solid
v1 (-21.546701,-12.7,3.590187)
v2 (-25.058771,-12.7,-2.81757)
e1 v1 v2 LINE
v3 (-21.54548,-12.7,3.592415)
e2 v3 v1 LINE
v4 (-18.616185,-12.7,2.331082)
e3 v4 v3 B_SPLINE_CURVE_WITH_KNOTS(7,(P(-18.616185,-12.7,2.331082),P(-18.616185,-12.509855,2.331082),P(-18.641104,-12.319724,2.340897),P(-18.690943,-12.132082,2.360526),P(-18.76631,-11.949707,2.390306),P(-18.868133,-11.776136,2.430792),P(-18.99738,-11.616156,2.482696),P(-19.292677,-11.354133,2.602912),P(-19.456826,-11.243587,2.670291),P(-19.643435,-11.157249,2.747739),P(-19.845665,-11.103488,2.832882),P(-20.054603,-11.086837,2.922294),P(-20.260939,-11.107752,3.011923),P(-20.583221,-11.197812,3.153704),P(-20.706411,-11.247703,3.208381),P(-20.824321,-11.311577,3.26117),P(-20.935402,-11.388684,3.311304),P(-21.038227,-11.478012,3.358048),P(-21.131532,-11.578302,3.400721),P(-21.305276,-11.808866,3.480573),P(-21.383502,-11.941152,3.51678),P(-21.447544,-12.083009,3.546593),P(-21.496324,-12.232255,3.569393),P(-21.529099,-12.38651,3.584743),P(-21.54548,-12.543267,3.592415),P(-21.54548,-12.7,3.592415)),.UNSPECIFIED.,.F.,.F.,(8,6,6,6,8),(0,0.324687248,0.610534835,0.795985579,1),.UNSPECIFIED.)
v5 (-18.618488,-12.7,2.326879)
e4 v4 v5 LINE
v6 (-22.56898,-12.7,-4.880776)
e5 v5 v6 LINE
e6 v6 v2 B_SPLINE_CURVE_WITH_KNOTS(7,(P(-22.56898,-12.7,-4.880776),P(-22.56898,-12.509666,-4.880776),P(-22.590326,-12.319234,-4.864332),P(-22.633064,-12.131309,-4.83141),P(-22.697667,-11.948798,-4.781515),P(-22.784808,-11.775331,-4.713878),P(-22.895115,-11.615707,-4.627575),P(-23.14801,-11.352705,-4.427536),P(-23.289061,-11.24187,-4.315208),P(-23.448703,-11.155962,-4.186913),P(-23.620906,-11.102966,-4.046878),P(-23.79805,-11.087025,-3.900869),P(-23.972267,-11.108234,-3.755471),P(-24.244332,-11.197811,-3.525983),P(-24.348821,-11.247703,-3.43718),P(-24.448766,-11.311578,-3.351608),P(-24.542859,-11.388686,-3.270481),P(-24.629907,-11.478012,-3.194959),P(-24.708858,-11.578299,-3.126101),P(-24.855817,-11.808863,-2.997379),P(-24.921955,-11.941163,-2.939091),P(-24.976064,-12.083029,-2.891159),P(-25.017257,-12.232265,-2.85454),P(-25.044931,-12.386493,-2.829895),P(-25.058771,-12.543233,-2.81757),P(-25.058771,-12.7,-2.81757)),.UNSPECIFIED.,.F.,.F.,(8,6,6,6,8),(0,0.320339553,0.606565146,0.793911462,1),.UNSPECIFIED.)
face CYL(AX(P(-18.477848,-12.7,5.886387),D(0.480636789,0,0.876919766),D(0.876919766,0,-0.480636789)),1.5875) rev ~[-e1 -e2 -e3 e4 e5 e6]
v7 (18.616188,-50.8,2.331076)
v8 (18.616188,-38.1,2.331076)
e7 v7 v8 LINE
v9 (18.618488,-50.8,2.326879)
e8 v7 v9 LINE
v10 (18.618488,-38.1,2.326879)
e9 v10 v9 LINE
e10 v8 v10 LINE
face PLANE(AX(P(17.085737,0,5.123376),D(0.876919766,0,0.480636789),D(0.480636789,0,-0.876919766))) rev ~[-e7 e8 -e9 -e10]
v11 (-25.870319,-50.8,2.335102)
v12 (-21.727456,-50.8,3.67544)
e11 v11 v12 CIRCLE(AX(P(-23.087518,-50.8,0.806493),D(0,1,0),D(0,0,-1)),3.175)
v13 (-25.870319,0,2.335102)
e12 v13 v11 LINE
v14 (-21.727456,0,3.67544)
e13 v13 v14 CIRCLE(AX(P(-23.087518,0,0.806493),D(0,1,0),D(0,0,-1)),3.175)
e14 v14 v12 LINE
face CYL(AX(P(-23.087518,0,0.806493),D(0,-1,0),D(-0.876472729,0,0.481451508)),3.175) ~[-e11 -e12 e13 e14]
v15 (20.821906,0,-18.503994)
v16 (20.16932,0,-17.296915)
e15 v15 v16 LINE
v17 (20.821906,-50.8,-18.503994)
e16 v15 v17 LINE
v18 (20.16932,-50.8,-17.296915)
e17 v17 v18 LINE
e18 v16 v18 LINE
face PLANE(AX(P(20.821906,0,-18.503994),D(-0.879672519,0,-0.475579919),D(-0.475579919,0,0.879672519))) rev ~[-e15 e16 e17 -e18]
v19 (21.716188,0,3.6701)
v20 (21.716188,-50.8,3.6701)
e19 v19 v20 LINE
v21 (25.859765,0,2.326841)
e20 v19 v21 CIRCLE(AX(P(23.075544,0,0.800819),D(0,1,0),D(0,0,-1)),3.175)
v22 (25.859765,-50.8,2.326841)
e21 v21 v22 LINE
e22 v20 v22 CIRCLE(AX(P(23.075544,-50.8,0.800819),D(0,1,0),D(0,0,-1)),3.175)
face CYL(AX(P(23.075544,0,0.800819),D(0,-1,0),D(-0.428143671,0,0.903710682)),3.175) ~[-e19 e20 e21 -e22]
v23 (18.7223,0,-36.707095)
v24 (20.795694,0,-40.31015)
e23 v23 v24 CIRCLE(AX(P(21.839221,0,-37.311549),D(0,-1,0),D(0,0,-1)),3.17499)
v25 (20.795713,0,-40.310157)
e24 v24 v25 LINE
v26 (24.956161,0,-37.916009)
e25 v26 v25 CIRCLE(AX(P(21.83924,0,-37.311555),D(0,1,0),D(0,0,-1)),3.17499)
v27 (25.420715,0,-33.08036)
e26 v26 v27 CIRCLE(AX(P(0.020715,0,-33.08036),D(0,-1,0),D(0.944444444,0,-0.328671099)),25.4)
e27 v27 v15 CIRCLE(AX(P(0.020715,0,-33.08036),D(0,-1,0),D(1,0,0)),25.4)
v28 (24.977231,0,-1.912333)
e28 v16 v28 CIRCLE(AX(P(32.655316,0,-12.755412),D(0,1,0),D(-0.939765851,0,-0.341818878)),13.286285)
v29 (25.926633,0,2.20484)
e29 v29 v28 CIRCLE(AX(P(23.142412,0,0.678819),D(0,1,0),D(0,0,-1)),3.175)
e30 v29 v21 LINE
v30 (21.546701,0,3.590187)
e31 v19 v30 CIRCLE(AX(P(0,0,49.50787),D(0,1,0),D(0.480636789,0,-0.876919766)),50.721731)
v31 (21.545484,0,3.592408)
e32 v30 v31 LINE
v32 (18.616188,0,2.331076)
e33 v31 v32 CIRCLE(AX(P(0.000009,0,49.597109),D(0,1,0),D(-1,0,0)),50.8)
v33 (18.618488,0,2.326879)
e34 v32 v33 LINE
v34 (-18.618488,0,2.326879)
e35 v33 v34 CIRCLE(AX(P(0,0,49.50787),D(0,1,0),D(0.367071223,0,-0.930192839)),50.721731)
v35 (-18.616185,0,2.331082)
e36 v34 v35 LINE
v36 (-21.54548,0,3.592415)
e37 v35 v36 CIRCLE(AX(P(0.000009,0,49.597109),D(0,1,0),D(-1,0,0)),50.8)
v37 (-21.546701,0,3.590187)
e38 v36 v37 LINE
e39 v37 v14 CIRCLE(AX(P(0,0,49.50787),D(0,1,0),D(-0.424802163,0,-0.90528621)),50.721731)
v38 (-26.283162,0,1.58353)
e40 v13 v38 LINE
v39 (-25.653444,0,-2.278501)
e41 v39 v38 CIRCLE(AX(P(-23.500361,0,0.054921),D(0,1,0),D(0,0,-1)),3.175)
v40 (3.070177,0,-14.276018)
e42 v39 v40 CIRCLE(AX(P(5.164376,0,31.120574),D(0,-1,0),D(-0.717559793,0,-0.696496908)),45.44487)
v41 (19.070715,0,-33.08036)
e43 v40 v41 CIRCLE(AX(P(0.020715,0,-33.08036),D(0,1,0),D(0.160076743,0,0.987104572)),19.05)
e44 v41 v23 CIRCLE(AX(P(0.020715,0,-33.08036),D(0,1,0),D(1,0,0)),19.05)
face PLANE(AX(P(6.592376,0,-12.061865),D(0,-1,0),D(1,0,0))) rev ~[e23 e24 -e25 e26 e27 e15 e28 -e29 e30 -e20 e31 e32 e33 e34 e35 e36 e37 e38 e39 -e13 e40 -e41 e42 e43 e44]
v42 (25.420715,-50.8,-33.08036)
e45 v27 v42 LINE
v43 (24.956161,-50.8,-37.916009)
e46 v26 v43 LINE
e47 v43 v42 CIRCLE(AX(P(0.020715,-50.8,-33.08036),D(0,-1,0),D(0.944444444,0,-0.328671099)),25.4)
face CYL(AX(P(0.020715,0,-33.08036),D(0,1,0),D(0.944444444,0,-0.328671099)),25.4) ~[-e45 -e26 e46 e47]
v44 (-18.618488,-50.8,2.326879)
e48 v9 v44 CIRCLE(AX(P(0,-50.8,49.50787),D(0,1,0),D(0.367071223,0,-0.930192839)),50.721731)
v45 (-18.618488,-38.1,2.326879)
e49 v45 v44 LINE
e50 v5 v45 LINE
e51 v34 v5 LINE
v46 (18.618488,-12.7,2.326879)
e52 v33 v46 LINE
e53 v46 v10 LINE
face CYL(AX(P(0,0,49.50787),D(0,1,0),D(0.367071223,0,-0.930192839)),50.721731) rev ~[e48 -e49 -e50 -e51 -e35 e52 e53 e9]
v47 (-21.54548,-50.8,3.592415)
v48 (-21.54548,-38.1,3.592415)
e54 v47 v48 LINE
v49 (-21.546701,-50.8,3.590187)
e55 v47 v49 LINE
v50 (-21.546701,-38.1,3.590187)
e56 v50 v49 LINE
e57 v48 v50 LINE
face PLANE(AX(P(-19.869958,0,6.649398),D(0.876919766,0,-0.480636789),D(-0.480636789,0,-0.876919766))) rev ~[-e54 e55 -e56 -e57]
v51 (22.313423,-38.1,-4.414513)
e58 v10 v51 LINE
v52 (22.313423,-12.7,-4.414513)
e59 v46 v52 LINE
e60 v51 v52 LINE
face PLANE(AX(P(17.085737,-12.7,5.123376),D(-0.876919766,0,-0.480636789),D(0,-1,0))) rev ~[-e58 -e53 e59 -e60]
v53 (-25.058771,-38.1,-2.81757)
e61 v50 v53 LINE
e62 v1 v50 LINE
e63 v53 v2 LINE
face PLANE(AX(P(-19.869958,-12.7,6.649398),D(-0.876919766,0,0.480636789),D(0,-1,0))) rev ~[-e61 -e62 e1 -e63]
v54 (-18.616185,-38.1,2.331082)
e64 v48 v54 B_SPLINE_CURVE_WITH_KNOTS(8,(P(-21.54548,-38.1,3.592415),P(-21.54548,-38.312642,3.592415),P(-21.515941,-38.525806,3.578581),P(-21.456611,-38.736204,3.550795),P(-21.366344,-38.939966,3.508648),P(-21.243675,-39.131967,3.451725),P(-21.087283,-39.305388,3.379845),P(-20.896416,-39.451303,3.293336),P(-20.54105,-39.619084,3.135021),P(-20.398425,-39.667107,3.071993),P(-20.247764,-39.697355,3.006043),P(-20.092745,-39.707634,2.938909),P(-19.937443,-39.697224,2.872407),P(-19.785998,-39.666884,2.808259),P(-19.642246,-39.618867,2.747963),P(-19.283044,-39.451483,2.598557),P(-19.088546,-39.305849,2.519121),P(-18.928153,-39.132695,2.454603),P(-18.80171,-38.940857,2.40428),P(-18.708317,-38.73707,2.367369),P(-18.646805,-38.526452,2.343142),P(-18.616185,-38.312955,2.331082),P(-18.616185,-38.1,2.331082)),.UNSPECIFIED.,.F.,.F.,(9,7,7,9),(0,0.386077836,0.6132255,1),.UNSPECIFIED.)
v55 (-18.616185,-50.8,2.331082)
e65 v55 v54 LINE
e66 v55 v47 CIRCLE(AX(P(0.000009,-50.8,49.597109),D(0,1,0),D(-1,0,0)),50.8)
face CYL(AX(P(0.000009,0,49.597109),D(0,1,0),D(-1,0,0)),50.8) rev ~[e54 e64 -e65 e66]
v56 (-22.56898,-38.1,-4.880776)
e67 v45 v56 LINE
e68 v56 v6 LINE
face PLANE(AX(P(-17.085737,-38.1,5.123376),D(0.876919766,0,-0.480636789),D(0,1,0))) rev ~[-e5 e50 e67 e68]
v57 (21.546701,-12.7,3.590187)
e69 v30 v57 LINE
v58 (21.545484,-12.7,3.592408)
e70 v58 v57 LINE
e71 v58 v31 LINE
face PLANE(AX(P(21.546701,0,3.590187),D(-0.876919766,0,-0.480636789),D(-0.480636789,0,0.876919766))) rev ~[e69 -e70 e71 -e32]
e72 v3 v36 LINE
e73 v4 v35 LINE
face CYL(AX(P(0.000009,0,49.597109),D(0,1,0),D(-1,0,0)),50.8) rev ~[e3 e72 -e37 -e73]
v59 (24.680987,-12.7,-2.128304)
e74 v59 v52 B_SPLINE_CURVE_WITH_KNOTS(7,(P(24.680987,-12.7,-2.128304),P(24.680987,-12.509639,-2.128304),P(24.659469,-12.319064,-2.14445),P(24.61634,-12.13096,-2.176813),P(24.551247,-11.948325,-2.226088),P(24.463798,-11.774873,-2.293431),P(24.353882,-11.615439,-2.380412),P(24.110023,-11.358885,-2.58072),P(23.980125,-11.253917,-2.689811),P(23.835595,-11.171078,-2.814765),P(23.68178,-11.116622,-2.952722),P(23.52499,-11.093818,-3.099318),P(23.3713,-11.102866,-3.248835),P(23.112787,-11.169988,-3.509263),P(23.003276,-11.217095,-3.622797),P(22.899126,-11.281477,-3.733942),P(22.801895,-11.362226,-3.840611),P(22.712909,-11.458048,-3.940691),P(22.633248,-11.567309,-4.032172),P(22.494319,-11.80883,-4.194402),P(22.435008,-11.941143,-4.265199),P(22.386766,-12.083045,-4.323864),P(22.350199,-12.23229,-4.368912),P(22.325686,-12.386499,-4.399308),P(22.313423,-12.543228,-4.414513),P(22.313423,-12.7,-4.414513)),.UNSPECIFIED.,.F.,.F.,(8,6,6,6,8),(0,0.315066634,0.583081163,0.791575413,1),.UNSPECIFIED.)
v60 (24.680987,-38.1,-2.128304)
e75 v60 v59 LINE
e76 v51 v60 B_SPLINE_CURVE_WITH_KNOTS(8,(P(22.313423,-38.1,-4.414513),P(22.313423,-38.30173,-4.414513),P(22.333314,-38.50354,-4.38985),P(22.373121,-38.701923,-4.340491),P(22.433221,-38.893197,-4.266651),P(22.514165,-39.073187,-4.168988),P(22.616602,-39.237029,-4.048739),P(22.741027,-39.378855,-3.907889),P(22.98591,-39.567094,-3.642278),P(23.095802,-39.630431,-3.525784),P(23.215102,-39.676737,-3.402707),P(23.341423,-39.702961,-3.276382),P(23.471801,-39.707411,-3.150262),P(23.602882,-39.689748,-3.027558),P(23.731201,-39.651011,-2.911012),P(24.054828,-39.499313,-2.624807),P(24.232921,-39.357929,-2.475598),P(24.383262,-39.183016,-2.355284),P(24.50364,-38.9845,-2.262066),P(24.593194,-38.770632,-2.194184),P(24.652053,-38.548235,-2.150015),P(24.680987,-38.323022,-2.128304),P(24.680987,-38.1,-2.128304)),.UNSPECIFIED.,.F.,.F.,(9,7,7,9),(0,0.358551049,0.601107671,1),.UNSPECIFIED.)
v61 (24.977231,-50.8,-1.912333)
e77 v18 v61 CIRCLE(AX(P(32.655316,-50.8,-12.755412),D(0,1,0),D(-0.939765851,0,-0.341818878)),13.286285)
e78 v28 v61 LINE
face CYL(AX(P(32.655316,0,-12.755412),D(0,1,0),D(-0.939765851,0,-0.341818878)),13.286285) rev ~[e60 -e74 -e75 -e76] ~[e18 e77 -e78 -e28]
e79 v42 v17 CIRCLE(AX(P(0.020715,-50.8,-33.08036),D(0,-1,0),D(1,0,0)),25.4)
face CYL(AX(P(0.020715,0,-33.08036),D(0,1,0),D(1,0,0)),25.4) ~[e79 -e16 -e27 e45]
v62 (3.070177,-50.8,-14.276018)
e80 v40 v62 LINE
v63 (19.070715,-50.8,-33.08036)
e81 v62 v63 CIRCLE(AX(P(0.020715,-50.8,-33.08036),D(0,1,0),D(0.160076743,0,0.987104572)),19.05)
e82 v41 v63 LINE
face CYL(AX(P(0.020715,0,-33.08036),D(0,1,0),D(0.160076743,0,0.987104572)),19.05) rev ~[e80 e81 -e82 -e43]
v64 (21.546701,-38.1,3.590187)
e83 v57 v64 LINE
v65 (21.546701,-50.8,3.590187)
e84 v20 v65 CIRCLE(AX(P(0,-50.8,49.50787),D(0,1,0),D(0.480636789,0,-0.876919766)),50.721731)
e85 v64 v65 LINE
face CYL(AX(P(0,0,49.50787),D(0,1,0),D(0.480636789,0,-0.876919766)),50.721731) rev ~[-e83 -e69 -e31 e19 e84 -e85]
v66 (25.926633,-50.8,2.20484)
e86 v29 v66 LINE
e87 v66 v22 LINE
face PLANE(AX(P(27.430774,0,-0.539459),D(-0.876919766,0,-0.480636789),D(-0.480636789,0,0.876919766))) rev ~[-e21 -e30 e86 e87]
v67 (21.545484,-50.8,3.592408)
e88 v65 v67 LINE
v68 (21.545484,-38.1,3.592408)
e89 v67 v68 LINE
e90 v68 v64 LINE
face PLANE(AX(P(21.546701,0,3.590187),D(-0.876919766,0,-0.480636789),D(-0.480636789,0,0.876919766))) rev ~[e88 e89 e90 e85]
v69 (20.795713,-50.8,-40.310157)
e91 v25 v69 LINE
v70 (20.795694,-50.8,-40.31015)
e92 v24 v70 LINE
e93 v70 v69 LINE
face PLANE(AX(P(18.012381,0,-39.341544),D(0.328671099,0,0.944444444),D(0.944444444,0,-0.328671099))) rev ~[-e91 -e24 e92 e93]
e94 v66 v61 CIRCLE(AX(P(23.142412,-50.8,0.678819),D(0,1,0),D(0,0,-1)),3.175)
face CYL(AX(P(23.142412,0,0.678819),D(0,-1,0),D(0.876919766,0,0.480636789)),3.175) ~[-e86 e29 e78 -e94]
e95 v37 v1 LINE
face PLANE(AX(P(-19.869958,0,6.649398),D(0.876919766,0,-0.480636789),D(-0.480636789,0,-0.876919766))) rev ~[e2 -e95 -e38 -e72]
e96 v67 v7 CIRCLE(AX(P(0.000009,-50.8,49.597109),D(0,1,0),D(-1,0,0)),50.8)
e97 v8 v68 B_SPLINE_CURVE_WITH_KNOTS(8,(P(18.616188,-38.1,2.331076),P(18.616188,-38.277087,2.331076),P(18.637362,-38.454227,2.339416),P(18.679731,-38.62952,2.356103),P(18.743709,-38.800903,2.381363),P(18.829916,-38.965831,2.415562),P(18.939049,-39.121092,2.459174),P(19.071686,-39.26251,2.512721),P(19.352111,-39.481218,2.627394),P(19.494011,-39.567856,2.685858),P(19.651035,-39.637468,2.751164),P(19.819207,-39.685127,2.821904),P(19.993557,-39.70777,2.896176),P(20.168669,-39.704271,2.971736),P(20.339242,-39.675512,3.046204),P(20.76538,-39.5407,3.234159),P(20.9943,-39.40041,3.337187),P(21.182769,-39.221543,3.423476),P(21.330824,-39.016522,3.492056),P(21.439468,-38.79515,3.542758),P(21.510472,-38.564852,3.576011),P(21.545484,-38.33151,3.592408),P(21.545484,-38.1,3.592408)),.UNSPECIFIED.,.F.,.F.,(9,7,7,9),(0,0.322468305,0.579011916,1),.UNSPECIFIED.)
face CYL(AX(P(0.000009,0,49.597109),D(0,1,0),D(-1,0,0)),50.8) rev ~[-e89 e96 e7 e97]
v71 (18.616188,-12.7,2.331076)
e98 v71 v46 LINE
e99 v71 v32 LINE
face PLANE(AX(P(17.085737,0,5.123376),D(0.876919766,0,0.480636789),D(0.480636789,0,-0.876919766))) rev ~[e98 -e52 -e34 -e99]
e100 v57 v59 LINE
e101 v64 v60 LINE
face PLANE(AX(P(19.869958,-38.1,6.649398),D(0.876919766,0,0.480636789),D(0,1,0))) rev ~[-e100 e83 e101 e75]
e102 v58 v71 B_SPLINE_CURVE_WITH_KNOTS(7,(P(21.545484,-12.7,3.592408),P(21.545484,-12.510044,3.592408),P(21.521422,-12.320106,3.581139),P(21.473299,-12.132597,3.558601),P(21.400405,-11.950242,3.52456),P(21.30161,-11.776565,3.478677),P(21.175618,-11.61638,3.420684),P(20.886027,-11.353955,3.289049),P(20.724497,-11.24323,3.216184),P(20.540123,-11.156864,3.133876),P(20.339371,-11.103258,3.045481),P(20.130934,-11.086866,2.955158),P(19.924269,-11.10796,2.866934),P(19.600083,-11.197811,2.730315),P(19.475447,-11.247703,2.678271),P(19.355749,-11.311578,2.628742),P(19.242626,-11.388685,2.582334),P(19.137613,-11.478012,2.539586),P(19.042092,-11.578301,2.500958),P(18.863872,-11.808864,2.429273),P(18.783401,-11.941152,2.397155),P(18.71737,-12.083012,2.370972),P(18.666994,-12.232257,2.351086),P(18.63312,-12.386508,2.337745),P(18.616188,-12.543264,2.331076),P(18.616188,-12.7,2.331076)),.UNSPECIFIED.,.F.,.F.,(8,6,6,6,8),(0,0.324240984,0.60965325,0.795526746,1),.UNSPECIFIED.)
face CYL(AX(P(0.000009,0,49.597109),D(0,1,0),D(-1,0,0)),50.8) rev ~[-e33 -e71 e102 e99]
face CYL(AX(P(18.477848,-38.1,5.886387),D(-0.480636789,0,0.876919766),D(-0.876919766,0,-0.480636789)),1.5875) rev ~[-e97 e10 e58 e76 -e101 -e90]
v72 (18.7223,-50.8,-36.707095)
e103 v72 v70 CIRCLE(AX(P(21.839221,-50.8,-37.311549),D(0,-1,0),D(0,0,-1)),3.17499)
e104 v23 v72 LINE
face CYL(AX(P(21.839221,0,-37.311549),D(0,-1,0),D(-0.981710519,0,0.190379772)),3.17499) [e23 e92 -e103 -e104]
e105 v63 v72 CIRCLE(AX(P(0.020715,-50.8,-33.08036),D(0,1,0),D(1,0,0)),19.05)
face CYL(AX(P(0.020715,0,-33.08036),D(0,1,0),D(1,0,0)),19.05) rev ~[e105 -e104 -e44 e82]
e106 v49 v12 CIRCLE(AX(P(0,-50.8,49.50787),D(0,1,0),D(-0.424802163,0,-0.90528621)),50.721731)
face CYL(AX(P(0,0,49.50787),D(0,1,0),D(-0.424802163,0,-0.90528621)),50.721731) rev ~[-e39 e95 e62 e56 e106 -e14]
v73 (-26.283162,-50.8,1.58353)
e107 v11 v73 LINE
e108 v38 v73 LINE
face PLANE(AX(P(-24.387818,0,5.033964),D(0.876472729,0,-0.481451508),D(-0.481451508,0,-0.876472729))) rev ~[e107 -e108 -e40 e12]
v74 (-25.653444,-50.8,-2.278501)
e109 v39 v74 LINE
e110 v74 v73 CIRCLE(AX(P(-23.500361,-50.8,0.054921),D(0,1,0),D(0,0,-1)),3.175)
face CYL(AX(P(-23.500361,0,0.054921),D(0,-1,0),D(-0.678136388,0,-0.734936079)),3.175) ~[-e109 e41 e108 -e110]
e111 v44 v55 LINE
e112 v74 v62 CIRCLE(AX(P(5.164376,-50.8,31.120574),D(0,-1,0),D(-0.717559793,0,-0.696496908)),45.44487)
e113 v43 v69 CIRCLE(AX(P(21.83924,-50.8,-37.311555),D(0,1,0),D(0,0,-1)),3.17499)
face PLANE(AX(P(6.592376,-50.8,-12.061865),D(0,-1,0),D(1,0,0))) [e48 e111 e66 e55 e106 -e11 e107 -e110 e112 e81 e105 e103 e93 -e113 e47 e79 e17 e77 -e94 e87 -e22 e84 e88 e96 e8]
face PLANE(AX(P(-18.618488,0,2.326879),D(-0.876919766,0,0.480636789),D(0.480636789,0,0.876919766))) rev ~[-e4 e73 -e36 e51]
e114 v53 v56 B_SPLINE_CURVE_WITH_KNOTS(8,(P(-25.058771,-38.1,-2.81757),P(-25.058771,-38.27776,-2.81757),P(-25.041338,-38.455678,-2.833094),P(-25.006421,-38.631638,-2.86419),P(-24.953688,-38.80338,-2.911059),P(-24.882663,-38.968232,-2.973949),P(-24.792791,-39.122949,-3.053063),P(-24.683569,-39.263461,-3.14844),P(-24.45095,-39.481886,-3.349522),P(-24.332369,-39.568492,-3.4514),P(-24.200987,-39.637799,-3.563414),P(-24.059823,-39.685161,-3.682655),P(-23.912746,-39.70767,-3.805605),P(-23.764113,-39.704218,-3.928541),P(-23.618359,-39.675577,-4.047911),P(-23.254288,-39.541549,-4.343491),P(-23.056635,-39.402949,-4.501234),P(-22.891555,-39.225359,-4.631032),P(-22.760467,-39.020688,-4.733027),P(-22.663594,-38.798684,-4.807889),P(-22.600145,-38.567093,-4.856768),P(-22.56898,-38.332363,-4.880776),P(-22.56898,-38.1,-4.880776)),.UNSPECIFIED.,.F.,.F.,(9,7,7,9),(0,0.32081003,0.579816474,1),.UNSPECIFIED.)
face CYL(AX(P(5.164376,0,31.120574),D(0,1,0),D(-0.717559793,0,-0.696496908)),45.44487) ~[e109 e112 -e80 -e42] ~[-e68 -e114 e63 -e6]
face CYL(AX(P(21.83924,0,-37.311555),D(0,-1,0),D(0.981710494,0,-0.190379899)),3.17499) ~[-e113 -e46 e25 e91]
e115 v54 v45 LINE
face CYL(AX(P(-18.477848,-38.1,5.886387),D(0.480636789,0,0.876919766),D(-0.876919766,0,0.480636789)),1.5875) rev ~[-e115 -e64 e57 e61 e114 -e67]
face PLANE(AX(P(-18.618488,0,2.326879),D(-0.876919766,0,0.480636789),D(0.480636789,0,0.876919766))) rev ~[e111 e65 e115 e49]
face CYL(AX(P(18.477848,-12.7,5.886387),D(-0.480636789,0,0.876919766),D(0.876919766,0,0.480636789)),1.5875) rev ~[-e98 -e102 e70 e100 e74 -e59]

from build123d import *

# Parameters (mm, degrees)
F1_DEPTH = 50.8
F2_R     = 3.17499
F4_DEPTH = 25.4
F6_DEPTH = 25.4
F7_R     = 50.8
F8_DEPTH = 50.8
F9_R     = 3.175


# Not quite as in the source:
# - a fillet or chamfer is up to 0.001 mm smaller than in the source, because OpenCascade refuses the exact size
# - a feature names something its author has since deleted; it is built from what else it names


with BuildPart() as f1:
    # F0 (on Front) → F1 (new body)
    with BuildSketch(Plane.XZ):
        with BuildLine():
            ThreePointArc((24.0096036311, -41.4286058918), (25.0654524906, -37.313693309), (25.4207147422, -33.0803599757))
            ThreePointArc((25.4207147422, -33.0803599757), (24.2437436495, -25.4380520418), (20.821906037, -18.5039941488))
            Line((20.821906037, -18.5039941488), (20.1693195051, -17.2969153494))
            ThreePointArc((20.1693195051, -17.2969153494), (20.4643815884, -7.4727541905), (27.4307736322, -0.5394587257))
            Line((27.4307736322, -0.5394587257), (24.3787300207, 5.0289817915))
            ThreePointArc((24.3787300207, 5.0289817915), (22.9739817859, 4.2874085483), (21.5467011146, 3.5901866586))
            ThreePointArc((21.5467011146, 3.5901866586), (20.0925256969, 2.935513576), (18.6184879198, 2.3268793492))
            ThreePointArc((18.6184879198, 2.3268793492), (0, -1.2138607271), (-18.6184879198, 2.3268793492))
            ThreePointArc((-18.6184879198, 2.3268793492), (-20.0925256969, 2.935513576), (-21.5467011146, 3.5901866586))
            ThreePointArc((-21.5467011146, 3.5901866586), (-22.97860176, 4.289755995), (-24.3878181692, 5.0339641827))
            Line((-24.3878181692, 5.0339641827), (-27.4450352449, -0.5316376492))
            ThreePointArc((-27.4450352449, -0.5316376492), (-13.4987465328, -10.3152085141), (3.0701766945, -14.276017876))
            ThreePointArc((3.0701766945, -14.276017876), (14.5292424103, -20.7351129184), (19.0707147422, -33.0803599757))
            ThreePointArc((19.0707147422, -33.0803599757), (18.8042680535, -36.2553599757), (18.0123814088, -39.3415444128))
            Line((18.0123814088, -39.3415444128), (24.0096036311, -41.4286058918))
        make_face()
        with BuildLine():
            ThreePointArc((18.6184879198, 2.3268793492), (20.0925256969, 2.935513576), (21.5467011146, 3.5901866586))
            Line((21.5467011146, 3.5901866586), (19.869957668, 6.6493979065))
            Line((19.869957668, 6.6493979065), (17.0857374094, 5.1233761008))
            Line((17.0857374094, 5.1233761008), (18.6184879198, 2.3268793492))
        make_face()
        with BuildLine():
            ThreePointArc((-21.5467011146, 3.5901866586), (-20.0925256969, 2.935513576), (-18.6184879198, 2.3268793492))
            Line((-18.6184879198, 2.3268793492), (-17.0857374094, 5.1233761008))
            Line((-17.0857374094, 5.1233761008), (-19.869957668, 6.6493979065))
            Line((-19.869957668, 6.6493979065), (-21.5467011146, 3.5901866586))
        make_face()
    extrude(amount=F1_DEPTH)

    # F2 (radius 3.175 in the source; OpenCascade refuses exactly that, so slightly less here)
    f2_edges = [f1.edges().sort_by_distance(p)[0] for p in [
        (24.009604, -25.4, -41.428606),
        (18.012381, -25.4, -39.341544),
    ]]
    fillet(f2_edges, radius=F2_R)

    # F3 (on face) → F4 (cut)
    with BuildSketch(Plane(origin=(1.7876055886, 0, -3.2614787517), x_dir=(0.8769197665, 0, 0.4806367892), z_dir=(-0.4806367892, 0, 0.8769197665))):
        with BuildLine():
            Line((20.6203038983, -38.1), (20.6203038983, -12.7))
            ThreePointArc((20.6203038983, -12.7), (19.0328038983, -11.1125), (17.4453038983, -12.7))
            Line((17.4453038983, -12.7), (17.4453038983, -38.1))
            ThreePointArc((17.4453038983, -38.1), (19.0328038983, -39.6875), (20.6203038983, -38.1))
        make_face()
    extrude(amount=-F4_DEPTH, mode=Mode.SUBTRACT)

    # F5 (on face) → F6 (cut)
    with BuildSketch(Plane(origin=(-1.7876055886, 0, -3.2614787517), x_dir=(0.8769197665, 0, -0.4806367892), z_dir=(0.4806367892, 0, 0.8769197665))):
        with BuildLine():
            ThreePointArc((-20.6203038983, -38.1), (-19.0328038983, -39.6875), (-17.4453038983, -38.1))
            Line((-17.4453038983, -38.1), (-17.4453038983, -12.7))
            ThreePointArc((-17.4453038983, -12.7), (-19.0328038983, -11.1125), (-20.6203038983, -12.7))
            Line((-20.6203038983, -12.7), (-20.6203038983, -38.1))
        make_face()
    extrude(amount=-F6_DEPTH, mode=Mode.SUBTRACT)

    # F7 (on face) → F8 (cut)
    with BuildSketch(Plane(origin=(0, 0, 0), x_dir=(-1, 0, 0), z_dir=(0, 1, 0))):
        with Locations((-9.1173e-06, 49.5971090476)):
            Circle(F7_R)
    extrude(amount=-F8_DEPTH, mode=Mode.SUBTRACT)

    # F9
    f9_edges = [f1.edges().sort_by_distance(p)[0] for p in [
        (24.37873, -25.4, 5.028982),
        (27.430774, -25.4, -0.539459),
        (-24.387818, -25.4, 5.033964),
        (-27.445035, -25.4, -0.531638),
    ]]
    fillet(f9_edges, radius=F9_R)


solid = f1.part
